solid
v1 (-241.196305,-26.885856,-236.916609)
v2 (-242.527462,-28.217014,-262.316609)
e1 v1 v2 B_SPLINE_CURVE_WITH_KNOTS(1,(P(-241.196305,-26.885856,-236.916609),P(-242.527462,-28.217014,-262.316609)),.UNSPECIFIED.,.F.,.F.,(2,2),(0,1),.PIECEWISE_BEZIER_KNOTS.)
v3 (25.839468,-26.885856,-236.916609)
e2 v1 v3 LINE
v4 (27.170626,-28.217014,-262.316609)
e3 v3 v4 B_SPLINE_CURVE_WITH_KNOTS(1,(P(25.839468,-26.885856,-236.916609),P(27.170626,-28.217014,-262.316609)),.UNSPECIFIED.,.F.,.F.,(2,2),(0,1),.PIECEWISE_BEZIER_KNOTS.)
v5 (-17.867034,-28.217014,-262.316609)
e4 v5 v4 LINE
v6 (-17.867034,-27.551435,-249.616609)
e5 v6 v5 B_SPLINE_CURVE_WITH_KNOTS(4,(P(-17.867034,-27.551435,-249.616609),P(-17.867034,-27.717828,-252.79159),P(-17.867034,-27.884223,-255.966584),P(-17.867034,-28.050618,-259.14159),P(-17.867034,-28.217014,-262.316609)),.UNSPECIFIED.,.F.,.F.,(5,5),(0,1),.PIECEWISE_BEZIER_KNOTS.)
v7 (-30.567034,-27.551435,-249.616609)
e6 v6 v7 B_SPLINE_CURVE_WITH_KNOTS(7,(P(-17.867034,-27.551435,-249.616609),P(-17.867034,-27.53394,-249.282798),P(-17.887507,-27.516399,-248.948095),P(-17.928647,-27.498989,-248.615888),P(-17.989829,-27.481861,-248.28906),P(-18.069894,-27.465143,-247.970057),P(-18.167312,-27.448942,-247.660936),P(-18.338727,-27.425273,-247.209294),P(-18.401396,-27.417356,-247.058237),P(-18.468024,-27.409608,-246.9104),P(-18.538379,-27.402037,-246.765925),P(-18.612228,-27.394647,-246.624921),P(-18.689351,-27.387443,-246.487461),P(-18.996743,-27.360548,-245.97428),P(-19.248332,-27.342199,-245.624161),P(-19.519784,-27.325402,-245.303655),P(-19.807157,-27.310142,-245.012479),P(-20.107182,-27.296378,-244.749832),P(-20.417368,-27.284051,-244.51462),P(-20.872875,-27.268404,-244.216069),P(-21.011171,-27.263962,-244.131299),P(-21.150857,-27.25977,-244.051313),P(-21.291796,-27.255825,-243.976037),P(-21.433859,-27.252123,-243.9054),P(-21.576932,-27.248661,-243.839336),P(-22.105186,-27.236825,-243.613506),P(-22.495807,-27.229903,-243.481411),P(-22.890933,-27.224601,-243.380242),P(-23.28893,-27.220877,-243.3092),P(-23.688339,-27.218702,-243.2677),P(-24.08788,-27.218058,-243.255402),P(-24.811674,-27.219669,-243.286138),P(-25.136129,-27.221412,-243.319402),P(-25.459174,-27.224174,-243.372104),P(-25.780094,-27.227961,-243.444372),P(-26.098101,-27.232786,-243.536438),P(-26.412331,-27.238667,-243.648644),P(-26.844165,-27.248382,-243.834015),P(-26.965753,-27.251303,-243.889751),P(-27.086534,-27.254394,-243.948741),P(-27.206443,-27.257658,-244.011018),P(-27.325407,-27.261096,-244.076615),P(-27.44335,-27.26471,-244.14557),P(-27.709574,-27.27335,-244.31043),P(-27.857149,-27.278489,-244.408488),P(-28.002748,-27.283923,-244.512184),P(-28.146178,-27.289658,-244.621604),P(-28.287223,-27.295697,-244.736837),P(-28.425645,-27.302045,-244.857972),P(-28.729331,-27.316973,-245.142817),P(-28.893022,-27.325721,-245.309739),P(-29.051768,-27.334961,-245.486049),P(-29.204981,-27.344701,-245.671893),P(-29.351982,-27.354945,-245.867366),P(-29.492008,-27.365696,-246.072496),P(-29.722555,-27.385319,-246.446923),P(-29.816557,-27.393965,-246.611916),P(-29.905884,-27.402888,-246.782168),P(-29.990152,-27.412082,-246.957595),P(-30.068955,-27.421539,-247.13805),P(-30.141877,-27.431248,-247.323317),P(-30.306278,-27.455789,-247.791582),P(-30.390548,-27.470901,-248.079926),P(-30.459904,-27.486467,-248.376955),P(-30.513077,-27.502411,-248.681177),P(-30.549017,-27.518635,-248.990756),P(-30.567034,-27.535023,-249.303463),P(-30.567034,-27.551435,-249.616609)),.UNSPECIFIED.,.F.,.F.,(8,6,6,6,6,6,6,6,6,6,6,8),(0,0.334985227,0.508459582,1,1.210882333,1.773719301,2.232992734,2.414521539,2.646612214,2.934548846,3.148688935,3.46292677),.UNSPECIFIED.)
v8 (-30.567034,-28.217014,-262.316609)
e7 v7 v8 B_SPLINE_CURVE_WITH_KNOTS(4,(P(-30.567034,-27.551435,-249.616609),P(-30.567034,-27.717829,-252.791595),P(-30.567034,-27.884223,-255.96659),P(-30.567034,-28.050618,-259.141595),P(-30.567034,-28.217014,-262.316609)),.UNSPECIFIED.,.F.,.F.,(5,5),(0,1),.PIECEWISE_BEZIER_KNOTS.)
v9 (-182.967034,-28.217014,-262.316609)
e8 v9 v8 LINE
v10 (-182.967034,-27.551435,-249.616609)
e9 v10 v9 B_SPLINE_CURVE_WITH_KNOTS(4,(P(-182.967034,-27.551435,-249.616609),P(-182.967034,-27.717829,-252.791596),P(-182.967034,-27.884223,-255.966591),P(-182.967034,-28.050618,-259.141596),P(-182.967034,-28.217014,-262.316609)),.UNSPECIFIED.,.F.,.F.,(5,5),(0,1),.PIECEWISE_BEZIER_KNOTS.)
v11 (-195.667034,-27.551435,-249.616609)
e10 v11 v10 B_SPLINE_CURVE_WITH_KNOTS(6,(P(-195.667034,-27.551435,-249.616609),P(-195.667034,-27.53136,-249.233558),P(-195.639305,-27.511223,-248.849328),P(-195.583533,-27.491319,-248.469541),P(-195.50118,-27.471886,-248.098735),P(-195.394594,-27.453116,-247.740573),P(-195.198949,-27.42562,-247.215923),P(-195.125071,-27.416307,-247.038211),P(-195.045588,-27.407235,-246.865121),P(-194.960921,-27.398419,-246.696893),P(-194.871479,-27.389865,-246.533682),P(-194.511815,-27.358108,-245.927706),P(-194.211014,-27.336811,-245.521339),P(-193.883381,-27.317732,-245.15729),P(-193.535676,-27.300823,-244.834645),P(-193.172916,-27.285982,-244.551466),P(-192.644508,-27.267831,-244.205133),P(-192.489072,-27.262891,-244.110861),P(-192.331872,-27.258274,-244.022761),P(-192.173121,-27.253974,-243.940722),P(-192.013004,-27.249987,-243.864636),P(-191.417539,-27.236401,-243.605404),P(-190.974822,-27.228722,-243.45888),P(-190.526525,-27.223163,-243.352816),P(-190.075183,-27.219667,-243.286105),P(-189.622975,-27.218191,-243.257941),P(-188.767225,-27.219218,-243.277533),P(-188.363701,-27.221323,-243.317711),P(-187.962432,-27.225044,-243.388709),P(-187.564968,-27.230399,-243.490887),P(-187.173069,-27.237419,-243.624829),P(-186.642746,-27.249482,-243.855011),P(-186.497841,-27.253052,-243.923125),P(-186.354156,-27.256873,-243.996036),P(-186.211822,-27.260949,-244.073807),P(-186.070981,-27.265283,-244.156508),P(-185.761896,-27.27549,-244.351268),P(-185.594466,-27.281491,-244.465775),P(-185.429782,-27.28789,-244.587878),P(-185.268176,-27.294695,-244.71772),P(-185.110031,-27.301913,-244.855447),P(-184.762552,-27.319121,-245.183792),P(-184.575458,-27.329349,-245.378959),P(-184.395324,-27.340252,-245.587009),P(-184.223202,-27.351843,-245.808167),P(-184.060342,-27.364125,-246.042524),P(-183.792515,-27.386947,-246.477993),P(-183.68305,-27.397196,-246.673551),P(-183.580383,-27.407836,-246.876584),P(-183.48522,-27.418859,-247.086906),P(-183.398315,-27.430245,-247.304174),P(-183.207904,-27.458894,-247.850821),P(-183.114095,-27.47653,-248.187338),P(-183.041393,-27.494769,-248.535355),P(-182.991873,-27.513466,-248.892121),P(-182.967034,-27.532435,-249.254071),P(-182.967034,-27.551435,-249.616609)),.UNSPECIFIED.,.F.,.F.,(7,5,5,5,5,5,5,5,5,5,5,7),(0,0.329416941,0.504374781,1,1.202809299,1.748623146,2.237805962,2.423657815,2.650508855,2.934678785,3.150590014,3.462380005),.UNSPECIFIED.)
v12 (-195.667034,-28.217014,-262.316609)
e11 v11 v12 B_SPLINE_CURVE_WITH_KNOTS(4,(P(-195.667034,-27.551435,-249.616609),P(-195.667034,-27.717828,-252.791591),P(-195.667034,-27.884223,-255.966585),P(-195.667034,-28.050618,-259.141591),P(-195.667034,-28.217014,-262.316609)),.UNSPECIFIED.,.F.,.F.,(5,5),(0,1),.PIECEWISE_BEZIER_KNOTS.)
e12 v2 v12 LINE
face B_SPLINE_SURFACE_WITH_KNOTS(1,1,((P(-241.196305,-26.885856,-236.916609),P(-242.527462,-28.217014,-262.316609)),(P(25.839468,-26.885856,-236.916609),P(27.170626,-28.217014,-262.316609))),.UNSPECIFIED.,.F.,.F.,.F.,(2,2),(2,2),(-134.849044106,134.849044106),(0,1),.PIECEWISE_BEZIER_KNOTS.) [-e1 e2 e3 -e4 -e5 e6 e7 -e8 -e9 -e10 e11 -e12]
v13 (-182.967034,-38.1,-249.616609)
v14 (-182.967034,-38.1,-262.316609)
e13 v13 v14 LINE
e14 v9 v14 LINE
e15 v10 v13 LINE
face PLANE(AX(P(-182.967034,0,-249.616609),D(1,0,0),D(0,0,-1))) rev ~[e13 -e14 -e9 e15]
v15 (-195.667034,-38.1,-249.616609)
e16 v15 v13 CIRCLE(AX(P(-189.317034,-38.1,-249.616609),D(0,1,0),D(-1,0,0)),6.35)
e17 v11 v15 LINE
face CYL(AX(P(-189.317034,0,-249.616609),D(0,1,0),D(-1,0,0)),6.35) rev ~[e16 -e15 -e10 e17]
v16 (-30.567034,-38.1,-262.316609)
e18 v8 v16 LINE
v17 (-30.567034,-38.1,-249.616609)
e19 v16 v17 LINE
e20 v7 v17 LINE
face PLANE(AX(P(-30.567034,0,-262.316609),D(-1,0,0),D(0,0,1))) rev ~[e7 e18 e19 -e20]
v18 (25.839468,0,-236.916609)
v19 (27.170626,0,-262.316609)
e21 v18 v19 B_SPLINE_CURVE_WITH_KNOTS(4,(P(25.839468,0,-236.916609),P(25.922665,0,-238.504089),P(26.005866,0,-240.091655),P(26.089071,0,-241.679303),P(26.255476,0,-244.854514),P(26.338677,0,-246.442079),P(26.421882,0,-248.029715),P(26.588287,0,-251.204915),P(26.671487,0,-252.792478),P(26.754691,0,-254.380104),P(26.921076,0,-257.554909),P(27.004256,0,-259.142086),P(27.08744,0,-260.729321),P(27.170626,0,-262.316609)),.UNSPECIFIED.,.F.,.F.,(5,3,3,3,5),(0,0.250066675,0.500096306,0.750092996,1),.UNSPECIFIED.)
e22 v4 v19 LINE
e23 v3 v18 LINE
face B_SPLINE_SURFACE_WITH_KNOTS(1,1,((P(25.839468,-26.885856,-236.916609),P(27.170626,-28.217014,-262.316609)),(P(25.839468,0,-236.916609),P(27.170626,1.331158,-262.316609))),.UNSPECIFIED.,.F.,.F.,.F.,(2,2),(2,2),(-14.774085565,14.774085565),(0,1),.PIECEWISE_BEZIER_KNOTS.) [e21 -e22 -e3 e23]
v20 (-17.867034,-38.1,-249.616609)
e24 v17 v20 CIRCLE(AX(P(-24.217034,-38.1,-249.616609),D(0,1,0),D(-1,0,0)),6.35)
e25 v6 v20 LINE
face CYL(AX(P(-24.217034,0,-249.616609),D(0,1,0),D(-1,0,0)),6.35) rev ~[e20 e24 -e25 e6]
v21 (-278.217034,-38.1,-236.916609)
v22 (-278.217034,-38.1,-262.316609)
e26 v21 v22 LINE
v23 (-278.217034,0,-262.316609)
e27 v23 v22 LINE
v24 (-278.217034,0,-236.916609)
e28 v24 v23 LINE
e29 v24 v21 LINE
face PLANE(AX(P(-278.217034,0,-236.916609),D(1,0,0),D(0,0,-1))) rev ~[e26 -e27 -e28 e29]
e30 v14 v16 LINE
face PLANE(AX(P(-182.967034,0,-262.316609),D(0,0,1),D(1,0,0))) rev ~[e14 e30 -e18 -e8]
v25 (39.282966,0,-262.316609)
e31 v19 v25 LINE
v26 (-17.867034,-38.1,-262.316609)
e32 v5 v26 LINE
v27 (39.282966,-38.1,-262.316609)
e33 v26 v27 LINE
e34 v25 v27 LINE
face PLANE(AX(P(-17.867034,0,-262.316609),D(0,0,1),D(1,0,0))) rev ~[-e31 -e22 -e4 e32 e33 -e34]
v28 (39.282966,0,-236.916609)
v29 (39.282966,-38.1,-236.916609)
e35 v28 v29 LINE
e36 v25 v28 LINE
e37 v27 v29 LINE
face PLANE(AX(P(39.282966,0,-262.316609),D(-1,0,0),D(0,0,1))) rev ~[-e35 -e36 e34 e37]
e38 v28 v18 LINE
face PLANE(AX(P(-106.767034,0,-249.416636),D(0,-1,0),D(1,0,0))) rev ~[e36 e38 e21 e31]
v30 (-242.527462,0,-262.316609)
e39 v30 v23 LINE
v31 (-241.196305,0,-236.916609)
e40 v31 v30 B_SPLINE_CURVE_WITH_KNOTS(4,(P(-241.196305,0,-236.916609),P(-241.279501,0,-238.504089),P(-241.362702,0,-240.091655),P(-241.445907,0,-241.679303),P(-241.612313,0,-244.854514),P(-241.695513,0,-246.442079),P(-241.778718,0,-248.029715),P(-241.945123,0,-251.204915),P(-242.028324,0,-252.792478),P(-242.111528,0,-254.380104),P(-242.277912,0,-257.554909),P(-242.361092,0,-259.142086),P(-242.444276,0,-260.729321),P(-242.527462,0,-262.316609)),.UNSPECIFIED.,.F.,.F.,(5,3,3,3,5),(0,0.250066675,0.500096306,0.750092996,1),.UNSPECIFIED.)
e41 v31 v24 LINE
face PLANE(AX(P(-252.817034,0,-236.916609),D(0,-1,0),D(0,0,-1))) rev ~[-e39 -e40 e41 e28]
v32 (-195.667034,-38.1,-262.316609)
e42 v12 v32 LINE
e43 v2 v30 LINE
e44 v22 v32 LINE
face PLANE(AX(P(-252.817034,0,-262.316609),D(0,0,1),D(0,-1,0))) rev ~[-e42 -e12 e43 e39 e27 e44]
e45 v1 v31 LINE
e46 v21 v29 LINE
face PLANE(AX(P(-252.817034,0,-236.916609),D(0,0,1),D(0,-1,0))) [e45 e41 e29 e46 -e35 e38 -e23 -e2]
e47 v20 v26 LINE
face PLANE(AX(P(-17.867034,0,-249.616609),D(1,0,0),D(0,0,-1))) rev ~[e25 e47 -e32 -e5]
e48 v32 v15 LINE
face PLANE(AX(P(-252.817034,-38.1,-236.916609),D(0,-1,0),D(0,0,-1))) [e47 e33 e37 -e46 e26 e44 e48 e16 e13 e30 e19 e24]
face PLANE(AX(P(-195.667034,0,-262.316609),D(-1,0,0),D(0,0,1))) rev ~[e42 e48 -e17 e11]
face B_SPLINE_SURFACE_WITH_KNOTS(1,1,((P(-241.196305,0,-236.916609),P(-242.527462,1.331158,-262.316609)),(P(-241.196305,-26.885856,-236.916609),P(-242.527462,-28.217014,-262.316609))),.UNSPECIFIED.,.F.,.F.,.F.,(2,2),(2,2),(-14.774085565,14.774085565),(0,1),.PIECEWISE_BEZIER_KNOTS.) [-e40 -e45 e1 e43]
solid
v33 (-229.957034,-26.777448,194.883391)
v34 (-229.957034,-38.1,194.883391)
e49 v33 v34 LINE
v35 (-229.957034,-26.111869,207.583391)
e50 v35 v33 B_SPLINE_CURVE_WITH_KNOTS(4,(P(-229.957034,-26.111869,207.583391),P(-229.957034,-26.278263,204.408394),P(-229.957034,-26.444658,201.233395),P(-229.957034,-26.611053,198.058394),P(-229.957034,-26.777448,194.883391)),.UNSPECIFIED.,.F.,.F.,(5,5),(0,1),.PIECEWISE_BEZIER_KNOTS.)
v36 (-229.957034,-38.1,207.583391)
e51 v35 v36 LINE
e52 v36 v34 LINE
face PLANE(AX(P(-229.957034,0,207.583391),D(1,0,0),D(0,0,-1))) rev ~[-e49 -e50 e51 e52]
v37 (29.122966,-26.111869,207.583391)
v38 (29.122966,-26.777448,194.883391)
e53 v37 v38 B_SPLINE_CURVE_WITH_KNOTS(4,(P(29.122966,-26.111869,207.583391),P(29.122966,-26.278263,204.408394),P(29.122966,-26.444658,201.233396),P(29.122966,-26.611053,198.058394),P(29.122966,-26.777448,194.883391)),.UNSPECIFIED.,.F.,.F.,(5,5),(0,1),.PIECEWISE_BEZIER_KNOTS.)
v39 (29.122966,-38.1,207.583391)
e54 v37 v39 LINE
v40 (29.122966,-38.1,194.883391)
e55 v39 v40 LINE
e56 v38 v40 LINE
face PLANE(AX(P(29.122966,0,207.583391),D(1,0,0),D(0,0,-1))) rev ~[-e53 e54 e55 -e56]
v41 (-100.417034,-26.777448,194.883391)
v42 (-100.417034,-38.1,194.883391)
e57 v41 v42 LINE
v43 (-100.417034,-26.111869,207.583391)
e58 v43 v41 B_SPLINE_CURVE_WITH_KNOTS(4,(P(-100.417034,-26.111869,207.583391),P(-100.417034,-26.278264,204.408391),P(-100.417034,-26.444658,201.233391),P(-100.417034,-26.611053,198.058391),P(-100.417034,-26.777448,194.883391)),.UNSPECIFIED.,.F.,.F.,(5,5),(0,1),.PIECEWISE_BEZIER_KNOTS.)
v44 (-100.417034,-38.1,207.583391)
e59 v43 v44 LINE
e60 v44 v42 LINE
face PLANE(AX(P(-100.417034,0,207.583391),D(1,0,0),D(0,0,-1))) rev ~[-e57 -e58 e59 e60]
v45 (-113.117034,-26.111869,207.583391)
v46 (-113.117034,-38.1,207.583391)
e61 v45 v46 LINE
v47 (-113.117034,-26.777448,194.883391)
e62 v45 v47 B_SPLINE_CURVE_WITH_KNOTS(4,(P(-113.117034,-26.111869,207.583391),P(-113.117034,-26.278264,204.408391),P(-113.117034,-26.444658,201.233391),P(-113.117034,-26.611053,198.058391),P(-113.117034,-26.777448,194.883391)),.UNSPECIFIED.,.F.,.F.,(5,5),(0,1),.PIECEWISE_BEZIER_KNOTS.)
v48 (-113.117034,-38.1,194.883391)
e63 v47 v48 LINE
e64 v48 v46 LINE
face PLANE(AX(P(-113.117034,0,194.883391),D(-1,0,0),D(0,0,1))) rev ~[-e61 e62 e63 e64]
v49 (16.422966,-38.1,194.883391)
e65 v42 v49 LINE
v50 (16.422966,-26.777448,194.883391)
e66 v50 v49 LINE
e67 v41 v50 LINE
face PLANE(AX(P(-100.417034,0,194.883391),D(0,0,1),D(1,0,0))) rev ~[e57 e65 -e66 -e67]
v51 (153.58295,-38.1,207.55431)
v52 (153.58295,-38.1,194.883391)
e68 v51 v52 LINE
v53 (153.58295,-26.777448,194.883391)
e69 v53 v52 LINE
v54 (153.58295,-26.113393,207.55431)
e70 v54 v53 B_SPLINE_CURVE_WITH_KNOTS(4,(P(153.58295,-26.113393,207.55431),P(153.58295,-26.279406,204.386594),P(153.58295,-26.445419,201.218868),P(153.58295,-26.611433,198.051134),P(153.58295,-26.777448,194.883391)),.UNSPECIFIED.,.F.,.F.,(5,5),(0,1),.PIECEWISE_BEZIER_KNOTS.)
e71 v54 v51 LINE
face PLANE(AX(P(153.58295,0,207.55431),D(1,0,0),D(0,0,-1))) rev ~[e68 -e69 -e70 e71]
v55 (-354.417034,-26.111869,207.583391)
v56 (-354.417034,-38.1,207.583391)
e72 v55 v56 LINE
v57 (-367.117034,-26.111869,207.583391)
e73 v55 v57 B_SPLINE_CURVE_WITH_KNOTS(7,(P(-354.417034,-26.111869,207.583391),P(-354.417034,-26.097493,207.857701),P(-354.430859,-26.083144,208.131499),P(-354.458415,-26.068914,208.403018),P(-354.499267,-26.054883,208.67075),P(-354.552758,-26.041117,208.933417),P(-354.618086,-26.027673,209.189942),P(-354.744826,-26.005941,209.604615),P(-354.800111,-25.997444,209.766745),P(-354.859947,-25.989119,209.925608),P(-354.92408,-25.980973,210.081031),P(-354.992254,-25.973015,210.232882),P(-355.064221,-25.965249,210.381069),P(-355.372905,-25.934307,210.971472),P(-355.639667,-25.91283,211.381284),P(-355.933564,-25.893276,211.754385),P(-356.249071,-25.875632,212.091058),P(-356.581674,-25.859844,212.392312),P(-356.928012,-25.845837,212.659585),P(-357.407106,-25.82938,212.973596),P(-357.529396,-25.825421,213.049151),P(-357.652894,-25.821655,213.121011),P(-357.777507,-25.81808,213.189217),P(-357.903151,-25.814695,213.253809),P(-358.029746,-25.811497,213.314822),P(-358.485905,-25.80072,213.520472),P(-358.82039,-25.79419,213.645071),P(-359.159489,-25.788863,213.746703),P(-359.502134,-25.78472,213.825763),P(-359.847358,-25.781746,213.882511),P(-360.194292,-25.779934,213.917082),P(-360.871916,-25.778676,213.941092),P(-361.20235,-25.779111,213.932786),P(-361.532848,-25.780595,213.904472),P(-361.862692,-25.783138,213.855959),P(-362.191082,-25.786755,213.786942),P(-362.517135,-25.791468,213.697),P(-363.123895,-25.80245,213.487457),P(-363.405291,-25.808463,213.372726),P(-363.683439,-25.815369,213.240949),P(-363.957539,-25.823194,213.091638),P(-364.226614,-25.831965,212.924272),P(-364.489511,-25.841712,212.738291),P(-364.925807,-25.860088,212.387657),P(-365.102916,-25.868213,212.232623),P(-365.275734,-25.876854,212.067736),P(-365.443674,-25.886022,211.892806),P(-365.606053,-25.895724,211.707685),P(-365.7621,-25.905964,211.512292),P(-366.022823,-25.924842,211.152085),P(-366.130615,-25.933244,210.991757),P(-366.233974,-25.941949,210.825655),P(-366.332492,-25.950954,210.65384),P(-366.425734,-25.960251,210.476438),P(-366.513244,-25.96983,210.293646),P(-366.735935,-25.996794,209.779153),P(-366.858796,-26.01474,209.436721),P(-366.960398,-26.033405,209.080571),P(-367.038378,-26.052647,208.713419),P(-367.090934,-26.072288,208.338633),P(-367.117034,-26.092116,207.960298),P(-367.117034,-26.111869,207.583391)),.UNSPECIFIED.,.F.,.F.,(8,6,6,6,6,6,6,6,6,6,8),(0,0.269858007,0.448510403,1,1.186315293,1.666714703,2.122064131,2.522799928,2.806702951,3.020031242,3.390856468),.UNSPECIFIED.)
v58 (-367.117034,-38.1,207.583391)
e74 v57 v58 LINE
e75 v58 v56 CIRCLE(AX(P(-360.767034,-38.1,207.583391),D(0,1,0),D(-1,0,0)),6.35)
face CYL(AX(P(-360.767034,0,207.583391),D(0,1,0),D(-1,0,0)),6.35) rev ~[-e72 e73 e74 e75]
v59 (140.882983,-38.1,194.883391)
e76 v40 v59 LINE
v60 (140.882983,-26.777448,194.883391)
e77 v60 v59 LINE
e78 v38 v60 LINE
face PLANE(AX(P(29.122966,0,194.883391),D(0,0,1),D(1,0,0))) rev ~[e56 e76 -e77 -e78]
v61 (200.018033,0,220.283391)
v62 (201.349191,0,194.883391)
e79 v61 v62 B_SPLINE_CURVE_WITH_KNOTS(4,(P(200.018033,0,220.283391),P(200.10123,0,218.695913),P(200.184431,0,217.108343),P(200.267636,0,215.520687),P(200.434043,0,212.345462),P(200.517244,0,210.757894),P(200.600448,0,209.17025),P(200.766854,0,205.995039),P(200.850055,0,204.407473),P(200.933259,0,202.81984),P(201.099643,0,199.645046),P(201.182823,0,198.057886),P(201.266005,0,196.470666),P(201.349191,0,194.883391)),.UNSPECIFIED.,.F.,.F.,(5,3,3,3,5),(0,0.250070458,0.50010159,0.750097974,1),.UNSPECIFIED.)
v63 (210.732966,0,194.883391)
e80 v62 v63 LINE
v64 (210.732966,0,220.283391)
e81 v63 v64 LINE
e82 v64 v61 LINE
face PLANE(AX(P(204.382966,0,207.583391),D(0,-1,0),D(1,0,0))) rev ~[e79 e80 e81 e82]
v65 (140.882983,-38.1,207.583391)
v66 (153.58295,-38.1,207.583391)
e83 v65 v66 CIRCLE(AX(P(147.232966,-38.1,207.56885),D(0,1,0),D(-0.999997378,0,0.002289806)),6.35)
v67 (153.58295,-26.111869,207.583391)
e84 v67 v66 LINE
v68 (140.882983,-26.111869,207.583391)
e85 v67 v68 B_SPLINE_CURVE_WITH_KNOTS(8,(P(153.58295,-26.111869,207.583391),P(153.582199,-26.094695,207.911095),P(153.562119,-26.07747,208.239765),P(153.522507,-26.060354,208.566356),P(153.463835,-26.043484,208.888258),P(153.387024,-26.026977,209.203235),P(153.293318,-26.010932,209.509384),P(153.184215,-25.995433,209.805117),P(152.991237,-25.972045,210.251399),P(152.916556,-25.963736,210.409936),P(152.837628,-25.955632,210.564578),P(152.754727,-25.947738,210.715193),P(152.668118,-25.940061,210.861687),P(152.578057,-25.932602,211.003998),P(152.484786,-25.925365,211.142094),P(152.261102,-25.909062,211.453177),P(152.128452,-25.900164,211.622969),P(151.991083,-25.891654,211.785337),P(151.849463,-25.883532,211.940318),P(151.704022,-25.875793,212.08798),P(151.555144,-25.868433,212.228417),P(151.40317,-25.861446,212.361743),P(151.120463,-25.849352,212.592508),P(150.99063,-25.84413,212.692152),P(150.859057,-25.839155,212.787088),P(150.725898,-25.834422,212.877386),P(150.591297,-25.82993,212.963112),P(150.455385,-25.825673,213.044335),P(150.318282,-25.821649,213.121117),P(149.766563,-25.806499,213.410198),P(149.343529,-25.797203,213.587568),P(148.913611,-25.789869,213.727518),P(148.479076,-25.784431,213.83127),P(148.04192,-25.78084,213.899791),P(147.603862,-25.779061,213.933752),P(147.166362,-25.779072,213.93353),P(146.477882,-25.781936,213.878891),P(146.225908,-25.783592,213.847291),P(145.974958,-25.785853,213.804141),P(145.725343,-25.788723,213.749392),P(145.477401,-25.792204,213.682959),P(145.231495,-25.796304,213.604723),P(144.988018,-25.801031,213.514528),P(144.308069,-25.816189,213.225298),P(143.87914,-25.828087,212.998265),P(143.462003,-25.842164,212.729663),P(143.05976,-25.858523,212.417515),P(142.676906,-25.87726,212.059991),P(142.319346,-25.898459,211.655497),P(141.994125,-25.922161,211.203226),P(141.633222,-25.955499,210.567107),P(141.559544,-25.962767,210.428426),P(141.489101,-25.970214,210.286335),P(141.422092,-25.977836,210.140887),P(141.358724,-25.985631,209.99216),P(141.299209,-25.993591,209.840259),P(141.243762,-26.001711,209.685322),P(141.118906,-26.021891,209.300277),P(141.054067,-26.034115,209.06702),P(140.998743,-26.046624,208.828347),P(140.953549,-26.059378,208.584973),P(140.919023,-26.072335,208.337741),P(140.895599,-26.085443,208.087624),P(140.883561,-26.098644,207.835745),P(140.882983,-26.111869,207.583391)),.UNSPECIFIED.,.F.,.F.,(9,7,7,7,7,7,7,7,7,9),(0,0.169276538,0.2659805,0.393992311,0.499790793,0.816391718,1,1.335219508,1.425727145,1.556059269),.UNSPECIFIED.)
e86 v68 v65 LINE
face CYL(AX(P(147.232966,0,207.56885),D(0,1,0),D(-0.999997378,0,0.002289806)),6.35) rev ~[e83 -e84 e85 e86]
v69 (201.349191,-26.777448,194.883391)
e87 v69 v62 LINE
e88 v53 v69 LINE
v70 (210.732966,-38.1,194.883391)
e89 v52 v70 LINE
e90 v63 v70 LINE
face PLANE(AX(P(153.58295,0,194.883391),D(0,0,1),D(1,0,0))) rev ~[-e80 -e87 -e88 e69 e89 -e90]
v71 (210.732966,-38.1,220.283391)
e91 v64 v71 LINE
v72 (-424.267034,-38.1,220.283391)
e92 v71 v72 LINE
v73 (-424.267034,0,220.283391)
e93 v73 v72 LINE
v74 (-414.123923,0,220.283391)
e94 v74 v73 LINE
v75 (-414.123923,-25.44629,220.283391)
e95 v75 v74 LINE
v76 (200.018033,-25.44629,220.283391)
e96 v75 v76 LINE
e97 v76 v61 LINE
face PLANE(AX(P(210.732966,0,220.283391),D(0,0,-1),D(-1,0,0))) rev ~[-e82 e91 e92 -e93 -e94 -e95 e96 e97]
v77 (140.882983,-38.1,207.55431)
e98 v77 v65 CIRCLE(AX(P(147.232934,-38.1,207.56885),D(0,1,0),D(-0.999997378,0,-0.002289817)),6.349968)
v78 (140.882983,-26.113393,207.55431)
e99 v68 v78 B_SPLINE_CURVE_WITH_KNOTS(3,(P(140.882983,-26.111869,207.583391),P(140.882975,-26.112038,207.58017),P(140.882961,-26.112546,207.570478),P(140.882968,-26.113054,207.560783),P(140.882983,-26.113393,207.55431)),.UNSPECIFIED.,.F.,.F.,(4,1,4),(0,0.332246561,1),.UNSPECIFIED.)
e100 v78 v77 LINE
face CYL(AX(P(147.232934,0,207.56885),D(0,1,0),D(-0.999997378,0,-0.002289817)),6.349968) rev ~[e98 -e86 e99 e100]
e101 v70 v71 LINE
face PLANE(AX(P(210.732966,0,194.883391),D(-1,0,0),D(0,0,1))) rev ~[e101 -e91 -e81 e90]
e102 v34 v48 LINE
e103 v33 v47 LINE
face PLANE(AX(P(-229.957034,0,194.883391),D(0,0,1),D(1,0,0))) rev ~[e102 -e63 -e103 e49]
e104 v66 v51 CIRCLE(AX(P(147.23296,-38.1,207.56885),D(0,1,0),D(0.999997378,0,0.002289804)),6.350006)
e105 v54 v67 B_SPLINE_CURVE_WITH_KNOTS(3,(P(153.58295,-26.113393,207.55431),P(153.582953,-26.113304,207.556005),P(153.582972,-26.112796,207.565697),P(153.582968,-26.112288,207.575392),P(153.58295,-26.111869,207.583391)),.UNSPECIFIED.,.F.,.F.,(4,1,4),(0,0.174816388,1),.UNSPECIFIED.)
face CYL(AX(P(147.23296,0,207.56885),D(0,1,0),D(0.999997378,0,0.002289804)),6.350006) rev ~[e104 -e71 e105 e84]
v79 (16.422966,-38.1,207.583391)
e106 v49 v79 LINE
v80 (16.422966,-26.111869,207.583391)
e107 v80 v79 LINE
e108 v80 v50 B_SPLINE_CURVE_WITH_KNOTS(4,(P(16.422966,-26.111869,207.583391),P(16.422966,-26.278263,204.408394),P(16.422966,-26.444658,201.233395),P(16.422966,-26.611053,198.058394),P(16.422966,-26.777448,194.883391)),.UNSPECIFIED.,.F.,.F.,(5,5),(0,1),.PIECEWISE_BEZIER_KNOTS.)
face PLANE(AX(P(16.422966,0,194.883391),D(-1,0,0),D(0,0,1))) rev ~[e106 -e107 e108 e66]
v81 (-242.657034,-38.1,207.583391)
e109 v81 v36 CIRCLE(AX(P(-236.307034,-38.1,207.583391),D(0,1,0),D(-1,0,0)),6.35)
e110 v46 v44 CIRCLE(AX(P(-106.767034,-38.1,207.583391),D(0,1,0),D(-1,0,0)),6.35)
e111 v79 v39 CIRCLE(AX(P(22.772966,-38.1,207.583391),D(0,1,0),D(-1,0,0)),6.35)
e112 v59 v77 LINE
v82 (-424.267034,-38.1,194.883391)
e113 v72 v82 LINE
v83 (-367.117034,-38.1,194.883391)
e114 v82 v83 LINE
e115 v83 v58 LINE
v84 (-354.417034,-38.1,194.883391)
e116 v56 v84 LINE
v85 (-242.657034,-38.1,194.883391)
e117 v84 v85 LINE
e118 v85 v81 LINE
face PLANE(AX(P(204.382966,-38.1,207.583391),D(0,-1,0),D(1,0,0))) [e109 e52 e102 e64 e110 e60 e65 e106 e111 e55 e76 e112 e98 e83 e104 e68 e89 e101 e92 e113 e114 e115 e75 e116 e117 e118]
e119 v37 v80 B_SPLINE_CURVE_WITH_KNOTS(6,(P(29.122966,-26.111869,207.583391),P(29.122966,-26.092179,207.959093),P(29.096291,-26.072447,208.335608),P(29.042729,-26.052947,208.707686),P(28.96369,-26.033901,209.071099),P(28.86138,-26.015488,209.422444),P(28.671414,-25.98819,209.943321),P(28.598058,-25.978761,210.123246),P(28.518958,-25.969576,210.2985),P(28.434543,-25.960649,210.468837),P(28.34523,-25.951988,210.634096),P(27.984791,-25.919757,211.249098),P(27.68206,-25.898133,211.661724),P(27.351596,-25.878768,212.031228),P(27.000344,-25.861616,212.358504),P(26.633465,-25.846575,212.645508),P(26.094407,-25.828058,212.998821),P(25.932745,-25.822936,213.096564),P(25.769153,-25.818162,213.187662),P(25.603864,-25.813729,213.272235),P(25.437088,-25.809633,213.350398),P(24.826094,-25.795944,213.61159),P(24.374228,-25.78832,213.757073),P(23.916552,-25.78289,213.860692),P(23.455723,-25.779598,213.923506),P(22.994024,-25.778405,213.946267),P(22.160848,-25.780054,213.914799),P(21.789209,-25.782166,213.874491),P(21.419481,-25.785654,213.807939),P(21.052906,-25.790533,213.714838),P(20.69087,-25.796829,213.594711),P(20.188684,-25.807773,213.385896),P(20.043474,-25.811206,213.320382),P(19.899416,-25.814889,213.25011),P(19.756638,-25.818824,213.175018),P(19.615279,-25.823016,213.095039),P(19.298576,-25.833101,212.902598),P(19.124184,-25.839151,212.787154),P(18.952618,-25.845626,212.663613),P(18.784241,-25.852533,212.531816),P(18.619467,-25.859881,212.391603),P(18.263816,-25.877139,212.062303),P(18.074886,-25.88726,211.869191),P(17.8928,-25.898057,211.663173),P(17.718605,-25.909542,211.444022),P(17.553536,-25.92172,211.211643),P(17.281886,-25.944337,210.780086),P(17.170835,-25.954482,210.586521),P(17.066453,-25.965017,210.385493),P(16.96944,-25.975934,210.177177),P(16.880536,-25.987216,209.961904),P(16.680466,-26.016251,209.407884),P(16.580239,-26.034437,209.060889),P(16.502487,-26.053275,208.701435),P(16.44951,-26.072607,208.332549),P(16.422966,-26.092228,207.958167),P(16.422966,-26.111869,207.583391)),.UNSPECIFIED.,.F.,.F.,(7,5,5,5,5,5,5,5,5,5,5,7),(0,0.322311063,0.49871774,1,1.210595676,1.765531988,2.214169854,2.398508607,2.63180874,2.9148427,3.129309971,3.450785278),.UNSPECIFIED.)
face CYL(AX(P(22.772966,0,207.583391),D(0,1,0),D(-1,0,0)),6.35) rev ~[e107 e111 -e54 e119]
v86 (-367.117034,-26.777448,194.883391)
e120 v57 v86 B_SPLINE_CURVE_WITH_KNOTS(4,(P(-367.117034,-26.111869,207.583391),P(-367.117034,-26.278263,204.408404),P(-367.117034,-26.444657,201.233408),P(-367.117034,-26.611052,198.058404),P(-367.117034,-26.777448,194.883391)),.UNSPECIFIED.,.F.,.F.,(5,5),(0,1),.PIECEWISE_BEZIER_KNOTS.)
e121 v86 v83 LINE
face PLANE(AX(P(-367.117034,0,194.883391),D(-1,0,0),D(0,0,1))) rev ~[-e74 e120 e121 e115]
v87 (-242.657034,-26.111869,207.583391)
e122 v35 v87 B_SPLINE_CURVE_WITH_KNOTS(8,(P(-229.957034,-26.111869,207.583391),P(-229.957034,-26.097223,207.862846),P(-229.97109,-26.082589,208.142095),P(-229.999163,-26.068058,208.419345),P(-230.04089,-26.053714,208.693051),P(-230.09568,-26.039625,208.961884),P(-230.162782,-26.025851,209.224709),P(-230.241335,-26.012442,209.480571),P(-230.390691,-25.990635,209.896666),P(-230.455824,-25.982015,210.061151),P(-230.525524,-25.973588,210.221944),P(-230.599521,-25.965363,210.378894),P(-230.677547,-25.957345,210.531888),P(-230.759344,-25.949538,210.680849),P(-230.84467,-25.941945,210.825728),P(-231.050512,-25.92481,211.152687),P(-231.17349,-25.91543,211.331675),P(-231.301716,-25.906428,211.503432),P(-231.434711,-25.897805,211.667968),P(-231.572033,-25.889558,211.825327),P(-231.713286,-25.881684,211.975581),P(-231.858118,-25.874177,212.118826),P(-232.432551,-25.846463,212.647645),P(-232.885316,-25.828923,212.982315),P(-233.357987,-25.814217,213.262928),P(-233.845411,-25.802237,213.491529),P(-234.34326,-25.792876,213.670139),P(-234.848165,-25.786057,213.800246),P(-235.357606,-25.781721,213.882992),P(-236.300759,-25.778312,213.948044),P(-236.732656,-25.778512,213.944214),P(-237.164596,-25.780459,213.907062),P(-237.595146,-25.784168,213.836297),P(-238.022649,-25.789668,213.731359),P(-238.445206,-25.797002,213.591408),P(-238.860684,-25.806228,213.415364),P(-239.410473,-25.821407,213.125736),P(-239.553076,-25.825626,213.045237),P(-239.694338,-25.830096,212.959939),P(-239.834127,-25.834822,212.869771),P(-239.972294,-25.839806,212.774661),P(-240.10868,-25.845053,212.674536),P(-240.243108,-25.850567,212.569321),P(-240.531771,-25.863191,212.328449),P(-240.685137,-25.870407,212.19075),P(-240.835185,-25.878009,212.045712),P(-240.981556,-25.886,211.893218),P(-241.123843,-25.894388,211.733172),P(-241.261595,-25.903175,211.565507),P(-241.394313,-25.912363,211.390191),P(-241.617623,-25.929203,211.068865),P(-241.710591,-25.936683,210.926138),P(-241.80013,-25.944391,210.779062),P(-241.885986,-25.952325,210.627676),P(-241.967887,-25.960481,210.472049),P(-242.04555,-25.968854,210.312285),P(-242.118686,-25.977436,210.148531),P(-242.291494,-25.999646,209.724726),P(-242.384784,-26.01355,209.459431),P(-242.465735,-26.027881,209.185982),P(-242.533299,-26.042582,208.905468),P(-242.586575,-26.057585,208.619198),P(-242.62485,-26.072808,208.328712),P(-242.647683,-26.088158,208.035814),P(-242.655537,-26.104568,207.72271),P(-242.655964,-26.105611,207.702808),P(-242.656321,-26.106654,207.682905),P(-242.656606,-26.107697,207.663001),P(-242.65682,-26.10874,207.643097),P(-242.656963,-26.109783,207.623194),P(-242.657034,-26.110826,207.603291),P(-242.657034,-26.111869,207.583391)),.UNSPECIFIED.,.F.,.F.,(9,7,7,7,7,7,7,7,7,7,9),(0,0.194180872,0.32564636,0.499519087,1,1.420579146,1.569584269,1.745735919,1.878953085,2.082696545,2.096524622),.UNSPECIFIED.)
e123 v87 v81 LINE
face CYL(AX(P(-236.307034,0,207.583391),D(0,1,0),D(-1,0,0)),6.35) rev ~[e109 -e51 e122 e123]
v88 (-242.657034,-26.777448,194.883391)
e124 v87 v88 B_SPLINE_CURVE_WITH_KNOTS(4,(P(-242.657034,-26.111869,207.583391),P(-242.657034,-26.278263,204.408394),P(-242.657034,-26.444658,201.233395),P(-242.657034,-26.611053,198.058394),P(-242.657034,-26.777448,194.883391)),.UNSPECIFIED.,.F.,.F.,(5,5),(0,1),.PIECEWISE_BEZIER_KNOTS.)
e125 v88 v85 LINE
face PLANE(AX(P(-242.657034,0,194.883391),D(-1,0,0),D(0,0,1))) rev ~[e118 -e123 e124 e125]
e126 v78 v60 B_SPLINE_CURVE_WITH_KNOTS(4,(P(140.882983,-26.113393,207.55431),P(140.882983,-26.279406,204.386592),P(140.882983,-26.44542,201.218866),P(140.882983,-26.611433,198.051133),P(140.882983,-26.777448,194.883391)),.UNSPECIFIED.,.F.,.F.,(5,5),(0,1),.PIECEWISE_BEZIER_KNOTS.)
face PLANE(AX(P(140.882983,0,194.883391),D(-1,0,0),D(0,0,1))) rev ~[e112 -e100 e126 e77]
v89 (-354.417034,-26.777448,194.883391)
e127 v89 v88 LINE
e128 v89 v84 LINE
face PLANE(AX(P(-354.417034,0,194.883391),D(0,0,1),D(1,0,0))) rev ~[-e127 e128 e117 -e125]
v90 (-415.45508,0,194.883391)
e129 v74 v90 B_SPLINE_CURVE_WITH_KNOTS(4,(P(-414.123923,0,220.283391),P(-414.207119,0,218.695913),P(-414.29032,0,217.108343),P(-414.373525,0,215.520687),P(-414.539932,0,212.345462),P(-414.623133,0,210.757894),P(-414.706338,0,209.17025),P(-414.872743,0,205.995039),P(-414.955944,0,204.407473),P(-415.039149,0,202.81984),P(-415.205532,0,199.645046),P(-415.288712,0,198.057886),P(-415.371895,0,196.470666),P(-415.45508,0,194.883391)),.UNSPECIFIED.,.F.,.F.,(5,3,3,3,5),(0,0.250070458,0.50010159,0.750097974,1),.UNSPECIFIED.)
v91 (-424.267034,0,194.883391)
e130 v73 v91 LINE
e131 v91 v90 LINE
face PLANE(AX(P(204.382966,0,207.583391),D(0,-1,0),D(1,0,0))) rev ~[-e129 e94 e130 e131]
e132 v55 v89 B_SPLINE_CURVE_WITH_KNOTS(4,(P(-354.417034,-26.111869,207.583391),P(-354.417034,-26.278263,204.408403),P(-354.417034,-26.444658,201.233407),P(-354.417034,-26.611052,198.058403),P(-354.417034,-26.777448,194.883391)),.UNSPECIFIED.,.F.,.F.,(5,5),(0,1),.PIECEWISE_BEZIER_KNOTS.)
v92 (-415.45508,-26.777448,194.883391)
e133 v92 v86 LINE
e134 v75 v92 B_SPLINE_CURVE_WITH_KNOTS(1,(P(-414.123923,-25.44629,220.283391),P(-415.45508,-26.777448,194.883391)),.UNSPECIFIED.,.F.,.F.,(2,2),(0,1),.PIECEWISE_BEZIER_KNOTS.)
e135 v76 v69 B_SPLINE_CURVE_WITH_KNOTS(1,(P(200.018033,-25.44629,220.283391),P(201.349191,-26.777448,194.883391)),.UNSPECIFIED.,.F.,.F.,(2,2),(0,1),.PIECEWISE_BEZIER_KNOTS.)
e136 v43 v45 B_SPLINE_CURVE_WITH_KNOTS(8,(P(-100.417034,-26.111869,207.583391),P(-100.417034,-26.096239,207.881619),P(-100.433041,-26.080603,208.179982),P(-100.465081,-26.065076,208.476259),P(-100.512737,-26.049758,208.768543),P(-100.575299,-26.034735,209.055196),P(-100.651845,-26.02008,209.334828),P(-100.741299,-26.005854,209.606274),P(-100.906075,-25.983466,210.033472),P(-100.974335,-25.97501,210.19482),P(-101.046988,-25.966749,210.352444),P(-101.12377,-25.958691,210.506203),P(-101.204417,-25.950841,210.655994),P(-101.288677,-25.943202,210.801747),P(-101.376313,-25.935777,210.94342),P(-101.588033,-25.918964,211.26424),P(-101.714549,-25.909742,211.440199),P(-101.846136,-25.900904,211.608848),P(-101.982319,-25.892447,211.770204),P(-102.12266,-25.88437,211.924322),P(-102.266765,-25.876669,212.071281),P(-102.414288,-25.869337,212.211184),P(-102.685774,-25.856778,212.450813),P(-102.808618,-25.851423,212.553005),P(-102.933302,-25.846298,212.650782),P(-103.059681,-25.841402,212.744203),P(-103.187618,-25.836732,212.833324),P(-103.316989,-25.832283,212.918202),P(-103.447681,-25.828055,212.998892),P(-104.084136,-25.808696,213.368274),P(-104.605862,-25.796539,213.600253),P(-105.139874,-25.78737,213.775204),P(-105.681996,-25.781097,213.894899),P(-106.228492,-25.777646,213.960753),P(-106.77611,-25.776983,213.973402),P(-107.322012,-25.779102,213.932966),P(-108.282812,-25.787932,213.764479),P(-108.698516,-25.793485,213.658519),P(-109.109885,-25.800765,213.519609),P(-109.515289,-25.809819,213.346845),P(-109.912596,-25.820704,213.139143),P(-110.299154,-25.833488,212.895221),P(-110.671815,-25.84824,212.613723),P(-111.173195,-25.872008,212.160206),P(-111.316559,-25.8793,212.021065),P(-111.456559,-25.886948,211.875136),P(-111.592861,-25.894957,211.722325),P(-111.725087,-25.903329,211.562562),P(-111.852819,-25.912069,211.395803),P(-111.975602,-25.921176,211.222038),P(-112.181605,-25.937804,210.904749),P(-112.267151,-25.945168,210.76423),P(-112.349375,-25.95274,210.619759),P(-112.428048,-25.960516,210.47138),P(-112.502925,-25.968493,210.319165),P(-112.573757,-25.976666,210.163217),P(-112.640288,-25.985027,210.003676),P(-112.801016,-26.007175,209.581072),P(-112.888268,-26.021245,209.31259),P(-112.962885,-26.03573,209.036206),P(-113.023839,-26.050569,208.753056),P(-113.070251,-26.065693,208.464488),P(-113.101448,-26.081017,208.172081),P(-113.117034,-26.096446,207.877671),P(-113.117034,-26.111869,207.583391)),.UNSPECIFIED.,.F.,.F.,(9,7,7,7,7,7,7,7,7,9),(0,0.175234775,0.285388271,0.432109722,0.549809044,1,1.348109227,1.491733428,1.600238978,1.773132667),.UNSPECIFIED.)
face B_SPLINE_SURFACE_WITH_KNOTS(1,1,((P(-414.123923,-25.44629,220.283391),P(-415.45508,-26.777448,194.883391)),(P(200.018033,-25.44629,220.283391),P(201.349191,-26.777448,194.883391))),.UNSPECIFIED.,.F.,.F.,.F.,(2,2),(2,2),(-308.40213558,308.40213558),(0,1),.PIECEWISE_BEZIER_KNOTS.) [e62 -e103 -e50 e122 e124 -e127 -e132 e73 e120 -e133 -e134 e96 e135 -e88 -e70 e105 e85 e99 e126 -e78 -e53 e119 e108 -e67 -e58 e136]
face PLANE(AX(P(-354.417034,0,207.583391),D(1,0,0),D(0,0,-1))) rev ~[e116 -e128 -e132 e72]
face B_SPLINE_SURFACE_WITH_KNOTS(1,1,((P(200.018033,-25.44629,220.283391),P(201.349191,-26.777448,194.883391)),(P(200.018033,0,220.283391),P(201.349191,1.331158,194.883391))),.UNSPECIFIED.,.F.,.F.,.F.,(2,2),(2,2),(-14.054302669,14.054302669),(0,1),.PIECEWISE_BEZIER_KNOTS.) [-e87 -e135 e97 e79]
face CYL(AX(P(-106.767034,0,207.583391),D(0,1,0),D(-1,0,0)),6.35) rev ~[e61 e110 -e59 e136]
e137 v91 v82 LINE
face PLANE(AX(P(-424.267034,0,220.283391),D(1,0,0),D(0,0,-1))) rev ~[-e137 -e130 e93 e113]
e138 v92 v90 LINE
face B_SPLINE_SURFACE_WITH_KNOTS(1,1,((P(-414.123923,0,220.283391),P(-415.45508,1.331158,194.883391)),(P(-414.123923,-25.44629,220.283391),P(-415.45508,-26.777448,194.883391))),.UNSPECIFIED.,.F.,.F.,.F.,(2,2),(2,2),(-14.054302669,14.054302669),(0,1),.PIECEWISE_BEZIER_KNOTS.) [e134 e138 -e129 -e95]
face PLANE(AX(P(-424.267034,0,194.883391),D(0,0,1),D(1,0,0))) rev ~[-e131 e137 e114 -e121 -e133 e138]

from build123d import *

# Parameters (mm, degrees)
F0_W     = 12.7
F0_H     = 25.4
F1_DEPTH = 38.1
F2_W     = 614.1419559717
F2_H     = 25.4462901503
F3_DEPTH = 25.4
F3_TAPER = -3
F4_W     = 267.035773024
F4_H     = 26.885855943
F5_DEPTH = 25.4
F5_TAPER = -3
F6_DEPTH = 25.4


# Not quite as in the source:
# - a feature of the source that left no trace in its solid (it failed there, or was rolled back) is left out


with BuildPart() as f1:
    # F0 (on Front) → F1 (new body)
    with BuildSketch(Plane.XZ):
        with Locations((204.3829661512, 207.5833906111)):
            Rectangle(F0_W, F0_H)
        with BuildLine():
            ThreePointArc((-367.1170338488, 207.5833906111), (-360.7670338488, 213.9333906111), (-354.4170338488, 207.5833906111))
            Line((-354.4170338488, 207.5833906111), (-354.4170338488, 194.8833906111))
            Line((-354.4170338488, 194.8833906111), (-242.6570338488, 194.8833906111))
            Line((-242.6570338488, 194.8833906111), (-242.6570338488, 207.5833906111))
            ThreePointArc((-242.6570338488, 207.5833906111), (-236.3070338488, 213.9333906111), (-229.9570338488, 207.5833906111))
            Line((-229.9570338488, 207.5833906111), (-229.9570338488, 194.8833906111))
            Line((-229.9570338488, 194.8833906111), (-113.1170338488, 194.8833906111))
            Line((-113.1170338488, 194.8833906111), (-113.1170338488, 207.5833906111))
            ThreePointArc((-113.1170338488, 207.5833906111), (-106.7670338488, 213.9333906111), (-100.4170338488, 207.5833906111))
            Line((-100.4170338488, 207.5833906111), (-100.4170338488, 194.8833906111))
            Line((-100.4170338488, 194.8833906111), (16.4229661512, 194.8833906111))
            Line((16.4229661512, 194.8833906111), (16.4229661512, 207.5833906111))
            ThreePointArc((16.4229661512, 207.5833906111), (22.7729661512, 213.9333906111), (29.1229661512, 207.5833906111))
            Line((29.1229661512, 207.5833906111), (29.1229661512, 194.8833906111))
            Line((29.1229661512, 194.8833906111), (140.8829827985, 194.8833906111))
            Line((140.8829827985, 194.8833906111), (140.8829827985, 207.5543100772))
            ThreePointArc((140.8829827985, 207.5543100772), (140.8829661512, 207.5688503442), (140.8829827985, 207.5833906112))
            ThreePointArc((140.8829827985, 207.5833906112), (147.2329661512, 213.9188503442), (153.582949504, 207.5833906111))
            ThreePointArc((153.582949504, 207.5833906111), (153.5829661512, 207.5688503442), (153.582949504, 207.5543100772))
            Line((153.582949504, 207.5543100772), (153.582949504, 194.8833906111))
            Line((153.582949504, 194.8833906111), (198.0329661512, 194.8833906111))
            Line((198.0329661512, 194.8833906111), (198.0329661512, 220.2833906111))
            Line((198.0329661512, 220.2833906111), (-411.5670338488, 220.2833906111))
            Line((-411.5670338488, 220.2833906111), (-424.2670338488, 220.2833906111))
            Line((-424.2670338488, 220.2833906111), (-424.2670338488, 194.8833906111))
            Line((-424.2670338488, 194.8833906111), (-411.5670338488, 194.8833906111))
            Line((-411.5670338488, 194.8833906111), (-367.1170338488, 194.8833906111))
            Line((-367.1170338488, 194.8833906111), (-367.1170338488, 207.5833906111))
        make_face()
    extrude(amount=F1_DEPTH)

    # F2 (on face) → F3 (cut)
    with BuildSketch(Plane.XY.offset(220.2833906111)):
        with Locations((-107.0529446006, -12.7231450751)):
            Rectangle(F2_W, F2_H)
    extrude(amount=-F3_DEPTH, taper=F3_TAPER, mode=Mode.SUBTRACT)


with BuildPart() as f1b:
    # F0 (on Front) → F1, piece 2 (new body)
    with BuildSketch(Plane.XZ):
        with BuildLine():
            ThreePointArc((-195.6670338488, -249.6166093889), (-189.3170338488, -243.2666093889), (-182.9670338488, -249.6166093889))
            Line((-182.9670338488, -249.6166093889), (-182.9670338488, -262.3166093889))
            Line((-182.9670338488, -262.3166093889), (-30.5670338488, -262.3166093889))
            Line((-30.5670338488, -262.3166093889), (-30.5670338488, -249.6166093889))
            ThreePointArc((-30.5670338488, -249.6166093889), (-24.2170338488, -243.2666093889), (-17.8670338488, -249.6166093889))
            Line((-17.8670338488, -249.6166093889), (-17.8670338488, -262.3166093889))
            Line((-17.8670338488, -262.3166093889), (39.2829661512, -262.3166093889))
            Line((39.2829661512, -262.3166093889), (39.2829661512, -236.9166093889))
            Line((39.2829661512, -236.9166093889), (-252.8170338488, -236.9166093889))
            Line((-252.8170338488, -236.9166093889), (-252.8170338488, -262.3166093889))
            Line((-252.8170338488, -262.3166093889), (-195.6670338488, -262.3166093889))
            Line((-195.6670338488, -262.3166093889), (-195.6670338488, -249.6166093889))
        make_face()
    extrude(amount=F1_DEPTH)

    # F4 (on face) → F5 (cut)
    with BuildSketch(Plane.XY.offset(-236.9166093889)):
        with Locations((-107.6784180477, -13.4429279715)):
            Rectangle(F4_W, F4_H)
    extrude(amount=-F5_DEPTH, taper=F5_TAPER, mode=Mode.SUBTRACT)

    # F6 (add): a face of the model
    f6_faces = [f1b.faces().sort_by_distance(p)[0] for p in [
        (-252.8170338488, -19.05, -249.6166093889),
    ]]
    extrude(f6_faces, amount=F6_DEPTH)


solid = Compound([f1.part, f1b.part])
